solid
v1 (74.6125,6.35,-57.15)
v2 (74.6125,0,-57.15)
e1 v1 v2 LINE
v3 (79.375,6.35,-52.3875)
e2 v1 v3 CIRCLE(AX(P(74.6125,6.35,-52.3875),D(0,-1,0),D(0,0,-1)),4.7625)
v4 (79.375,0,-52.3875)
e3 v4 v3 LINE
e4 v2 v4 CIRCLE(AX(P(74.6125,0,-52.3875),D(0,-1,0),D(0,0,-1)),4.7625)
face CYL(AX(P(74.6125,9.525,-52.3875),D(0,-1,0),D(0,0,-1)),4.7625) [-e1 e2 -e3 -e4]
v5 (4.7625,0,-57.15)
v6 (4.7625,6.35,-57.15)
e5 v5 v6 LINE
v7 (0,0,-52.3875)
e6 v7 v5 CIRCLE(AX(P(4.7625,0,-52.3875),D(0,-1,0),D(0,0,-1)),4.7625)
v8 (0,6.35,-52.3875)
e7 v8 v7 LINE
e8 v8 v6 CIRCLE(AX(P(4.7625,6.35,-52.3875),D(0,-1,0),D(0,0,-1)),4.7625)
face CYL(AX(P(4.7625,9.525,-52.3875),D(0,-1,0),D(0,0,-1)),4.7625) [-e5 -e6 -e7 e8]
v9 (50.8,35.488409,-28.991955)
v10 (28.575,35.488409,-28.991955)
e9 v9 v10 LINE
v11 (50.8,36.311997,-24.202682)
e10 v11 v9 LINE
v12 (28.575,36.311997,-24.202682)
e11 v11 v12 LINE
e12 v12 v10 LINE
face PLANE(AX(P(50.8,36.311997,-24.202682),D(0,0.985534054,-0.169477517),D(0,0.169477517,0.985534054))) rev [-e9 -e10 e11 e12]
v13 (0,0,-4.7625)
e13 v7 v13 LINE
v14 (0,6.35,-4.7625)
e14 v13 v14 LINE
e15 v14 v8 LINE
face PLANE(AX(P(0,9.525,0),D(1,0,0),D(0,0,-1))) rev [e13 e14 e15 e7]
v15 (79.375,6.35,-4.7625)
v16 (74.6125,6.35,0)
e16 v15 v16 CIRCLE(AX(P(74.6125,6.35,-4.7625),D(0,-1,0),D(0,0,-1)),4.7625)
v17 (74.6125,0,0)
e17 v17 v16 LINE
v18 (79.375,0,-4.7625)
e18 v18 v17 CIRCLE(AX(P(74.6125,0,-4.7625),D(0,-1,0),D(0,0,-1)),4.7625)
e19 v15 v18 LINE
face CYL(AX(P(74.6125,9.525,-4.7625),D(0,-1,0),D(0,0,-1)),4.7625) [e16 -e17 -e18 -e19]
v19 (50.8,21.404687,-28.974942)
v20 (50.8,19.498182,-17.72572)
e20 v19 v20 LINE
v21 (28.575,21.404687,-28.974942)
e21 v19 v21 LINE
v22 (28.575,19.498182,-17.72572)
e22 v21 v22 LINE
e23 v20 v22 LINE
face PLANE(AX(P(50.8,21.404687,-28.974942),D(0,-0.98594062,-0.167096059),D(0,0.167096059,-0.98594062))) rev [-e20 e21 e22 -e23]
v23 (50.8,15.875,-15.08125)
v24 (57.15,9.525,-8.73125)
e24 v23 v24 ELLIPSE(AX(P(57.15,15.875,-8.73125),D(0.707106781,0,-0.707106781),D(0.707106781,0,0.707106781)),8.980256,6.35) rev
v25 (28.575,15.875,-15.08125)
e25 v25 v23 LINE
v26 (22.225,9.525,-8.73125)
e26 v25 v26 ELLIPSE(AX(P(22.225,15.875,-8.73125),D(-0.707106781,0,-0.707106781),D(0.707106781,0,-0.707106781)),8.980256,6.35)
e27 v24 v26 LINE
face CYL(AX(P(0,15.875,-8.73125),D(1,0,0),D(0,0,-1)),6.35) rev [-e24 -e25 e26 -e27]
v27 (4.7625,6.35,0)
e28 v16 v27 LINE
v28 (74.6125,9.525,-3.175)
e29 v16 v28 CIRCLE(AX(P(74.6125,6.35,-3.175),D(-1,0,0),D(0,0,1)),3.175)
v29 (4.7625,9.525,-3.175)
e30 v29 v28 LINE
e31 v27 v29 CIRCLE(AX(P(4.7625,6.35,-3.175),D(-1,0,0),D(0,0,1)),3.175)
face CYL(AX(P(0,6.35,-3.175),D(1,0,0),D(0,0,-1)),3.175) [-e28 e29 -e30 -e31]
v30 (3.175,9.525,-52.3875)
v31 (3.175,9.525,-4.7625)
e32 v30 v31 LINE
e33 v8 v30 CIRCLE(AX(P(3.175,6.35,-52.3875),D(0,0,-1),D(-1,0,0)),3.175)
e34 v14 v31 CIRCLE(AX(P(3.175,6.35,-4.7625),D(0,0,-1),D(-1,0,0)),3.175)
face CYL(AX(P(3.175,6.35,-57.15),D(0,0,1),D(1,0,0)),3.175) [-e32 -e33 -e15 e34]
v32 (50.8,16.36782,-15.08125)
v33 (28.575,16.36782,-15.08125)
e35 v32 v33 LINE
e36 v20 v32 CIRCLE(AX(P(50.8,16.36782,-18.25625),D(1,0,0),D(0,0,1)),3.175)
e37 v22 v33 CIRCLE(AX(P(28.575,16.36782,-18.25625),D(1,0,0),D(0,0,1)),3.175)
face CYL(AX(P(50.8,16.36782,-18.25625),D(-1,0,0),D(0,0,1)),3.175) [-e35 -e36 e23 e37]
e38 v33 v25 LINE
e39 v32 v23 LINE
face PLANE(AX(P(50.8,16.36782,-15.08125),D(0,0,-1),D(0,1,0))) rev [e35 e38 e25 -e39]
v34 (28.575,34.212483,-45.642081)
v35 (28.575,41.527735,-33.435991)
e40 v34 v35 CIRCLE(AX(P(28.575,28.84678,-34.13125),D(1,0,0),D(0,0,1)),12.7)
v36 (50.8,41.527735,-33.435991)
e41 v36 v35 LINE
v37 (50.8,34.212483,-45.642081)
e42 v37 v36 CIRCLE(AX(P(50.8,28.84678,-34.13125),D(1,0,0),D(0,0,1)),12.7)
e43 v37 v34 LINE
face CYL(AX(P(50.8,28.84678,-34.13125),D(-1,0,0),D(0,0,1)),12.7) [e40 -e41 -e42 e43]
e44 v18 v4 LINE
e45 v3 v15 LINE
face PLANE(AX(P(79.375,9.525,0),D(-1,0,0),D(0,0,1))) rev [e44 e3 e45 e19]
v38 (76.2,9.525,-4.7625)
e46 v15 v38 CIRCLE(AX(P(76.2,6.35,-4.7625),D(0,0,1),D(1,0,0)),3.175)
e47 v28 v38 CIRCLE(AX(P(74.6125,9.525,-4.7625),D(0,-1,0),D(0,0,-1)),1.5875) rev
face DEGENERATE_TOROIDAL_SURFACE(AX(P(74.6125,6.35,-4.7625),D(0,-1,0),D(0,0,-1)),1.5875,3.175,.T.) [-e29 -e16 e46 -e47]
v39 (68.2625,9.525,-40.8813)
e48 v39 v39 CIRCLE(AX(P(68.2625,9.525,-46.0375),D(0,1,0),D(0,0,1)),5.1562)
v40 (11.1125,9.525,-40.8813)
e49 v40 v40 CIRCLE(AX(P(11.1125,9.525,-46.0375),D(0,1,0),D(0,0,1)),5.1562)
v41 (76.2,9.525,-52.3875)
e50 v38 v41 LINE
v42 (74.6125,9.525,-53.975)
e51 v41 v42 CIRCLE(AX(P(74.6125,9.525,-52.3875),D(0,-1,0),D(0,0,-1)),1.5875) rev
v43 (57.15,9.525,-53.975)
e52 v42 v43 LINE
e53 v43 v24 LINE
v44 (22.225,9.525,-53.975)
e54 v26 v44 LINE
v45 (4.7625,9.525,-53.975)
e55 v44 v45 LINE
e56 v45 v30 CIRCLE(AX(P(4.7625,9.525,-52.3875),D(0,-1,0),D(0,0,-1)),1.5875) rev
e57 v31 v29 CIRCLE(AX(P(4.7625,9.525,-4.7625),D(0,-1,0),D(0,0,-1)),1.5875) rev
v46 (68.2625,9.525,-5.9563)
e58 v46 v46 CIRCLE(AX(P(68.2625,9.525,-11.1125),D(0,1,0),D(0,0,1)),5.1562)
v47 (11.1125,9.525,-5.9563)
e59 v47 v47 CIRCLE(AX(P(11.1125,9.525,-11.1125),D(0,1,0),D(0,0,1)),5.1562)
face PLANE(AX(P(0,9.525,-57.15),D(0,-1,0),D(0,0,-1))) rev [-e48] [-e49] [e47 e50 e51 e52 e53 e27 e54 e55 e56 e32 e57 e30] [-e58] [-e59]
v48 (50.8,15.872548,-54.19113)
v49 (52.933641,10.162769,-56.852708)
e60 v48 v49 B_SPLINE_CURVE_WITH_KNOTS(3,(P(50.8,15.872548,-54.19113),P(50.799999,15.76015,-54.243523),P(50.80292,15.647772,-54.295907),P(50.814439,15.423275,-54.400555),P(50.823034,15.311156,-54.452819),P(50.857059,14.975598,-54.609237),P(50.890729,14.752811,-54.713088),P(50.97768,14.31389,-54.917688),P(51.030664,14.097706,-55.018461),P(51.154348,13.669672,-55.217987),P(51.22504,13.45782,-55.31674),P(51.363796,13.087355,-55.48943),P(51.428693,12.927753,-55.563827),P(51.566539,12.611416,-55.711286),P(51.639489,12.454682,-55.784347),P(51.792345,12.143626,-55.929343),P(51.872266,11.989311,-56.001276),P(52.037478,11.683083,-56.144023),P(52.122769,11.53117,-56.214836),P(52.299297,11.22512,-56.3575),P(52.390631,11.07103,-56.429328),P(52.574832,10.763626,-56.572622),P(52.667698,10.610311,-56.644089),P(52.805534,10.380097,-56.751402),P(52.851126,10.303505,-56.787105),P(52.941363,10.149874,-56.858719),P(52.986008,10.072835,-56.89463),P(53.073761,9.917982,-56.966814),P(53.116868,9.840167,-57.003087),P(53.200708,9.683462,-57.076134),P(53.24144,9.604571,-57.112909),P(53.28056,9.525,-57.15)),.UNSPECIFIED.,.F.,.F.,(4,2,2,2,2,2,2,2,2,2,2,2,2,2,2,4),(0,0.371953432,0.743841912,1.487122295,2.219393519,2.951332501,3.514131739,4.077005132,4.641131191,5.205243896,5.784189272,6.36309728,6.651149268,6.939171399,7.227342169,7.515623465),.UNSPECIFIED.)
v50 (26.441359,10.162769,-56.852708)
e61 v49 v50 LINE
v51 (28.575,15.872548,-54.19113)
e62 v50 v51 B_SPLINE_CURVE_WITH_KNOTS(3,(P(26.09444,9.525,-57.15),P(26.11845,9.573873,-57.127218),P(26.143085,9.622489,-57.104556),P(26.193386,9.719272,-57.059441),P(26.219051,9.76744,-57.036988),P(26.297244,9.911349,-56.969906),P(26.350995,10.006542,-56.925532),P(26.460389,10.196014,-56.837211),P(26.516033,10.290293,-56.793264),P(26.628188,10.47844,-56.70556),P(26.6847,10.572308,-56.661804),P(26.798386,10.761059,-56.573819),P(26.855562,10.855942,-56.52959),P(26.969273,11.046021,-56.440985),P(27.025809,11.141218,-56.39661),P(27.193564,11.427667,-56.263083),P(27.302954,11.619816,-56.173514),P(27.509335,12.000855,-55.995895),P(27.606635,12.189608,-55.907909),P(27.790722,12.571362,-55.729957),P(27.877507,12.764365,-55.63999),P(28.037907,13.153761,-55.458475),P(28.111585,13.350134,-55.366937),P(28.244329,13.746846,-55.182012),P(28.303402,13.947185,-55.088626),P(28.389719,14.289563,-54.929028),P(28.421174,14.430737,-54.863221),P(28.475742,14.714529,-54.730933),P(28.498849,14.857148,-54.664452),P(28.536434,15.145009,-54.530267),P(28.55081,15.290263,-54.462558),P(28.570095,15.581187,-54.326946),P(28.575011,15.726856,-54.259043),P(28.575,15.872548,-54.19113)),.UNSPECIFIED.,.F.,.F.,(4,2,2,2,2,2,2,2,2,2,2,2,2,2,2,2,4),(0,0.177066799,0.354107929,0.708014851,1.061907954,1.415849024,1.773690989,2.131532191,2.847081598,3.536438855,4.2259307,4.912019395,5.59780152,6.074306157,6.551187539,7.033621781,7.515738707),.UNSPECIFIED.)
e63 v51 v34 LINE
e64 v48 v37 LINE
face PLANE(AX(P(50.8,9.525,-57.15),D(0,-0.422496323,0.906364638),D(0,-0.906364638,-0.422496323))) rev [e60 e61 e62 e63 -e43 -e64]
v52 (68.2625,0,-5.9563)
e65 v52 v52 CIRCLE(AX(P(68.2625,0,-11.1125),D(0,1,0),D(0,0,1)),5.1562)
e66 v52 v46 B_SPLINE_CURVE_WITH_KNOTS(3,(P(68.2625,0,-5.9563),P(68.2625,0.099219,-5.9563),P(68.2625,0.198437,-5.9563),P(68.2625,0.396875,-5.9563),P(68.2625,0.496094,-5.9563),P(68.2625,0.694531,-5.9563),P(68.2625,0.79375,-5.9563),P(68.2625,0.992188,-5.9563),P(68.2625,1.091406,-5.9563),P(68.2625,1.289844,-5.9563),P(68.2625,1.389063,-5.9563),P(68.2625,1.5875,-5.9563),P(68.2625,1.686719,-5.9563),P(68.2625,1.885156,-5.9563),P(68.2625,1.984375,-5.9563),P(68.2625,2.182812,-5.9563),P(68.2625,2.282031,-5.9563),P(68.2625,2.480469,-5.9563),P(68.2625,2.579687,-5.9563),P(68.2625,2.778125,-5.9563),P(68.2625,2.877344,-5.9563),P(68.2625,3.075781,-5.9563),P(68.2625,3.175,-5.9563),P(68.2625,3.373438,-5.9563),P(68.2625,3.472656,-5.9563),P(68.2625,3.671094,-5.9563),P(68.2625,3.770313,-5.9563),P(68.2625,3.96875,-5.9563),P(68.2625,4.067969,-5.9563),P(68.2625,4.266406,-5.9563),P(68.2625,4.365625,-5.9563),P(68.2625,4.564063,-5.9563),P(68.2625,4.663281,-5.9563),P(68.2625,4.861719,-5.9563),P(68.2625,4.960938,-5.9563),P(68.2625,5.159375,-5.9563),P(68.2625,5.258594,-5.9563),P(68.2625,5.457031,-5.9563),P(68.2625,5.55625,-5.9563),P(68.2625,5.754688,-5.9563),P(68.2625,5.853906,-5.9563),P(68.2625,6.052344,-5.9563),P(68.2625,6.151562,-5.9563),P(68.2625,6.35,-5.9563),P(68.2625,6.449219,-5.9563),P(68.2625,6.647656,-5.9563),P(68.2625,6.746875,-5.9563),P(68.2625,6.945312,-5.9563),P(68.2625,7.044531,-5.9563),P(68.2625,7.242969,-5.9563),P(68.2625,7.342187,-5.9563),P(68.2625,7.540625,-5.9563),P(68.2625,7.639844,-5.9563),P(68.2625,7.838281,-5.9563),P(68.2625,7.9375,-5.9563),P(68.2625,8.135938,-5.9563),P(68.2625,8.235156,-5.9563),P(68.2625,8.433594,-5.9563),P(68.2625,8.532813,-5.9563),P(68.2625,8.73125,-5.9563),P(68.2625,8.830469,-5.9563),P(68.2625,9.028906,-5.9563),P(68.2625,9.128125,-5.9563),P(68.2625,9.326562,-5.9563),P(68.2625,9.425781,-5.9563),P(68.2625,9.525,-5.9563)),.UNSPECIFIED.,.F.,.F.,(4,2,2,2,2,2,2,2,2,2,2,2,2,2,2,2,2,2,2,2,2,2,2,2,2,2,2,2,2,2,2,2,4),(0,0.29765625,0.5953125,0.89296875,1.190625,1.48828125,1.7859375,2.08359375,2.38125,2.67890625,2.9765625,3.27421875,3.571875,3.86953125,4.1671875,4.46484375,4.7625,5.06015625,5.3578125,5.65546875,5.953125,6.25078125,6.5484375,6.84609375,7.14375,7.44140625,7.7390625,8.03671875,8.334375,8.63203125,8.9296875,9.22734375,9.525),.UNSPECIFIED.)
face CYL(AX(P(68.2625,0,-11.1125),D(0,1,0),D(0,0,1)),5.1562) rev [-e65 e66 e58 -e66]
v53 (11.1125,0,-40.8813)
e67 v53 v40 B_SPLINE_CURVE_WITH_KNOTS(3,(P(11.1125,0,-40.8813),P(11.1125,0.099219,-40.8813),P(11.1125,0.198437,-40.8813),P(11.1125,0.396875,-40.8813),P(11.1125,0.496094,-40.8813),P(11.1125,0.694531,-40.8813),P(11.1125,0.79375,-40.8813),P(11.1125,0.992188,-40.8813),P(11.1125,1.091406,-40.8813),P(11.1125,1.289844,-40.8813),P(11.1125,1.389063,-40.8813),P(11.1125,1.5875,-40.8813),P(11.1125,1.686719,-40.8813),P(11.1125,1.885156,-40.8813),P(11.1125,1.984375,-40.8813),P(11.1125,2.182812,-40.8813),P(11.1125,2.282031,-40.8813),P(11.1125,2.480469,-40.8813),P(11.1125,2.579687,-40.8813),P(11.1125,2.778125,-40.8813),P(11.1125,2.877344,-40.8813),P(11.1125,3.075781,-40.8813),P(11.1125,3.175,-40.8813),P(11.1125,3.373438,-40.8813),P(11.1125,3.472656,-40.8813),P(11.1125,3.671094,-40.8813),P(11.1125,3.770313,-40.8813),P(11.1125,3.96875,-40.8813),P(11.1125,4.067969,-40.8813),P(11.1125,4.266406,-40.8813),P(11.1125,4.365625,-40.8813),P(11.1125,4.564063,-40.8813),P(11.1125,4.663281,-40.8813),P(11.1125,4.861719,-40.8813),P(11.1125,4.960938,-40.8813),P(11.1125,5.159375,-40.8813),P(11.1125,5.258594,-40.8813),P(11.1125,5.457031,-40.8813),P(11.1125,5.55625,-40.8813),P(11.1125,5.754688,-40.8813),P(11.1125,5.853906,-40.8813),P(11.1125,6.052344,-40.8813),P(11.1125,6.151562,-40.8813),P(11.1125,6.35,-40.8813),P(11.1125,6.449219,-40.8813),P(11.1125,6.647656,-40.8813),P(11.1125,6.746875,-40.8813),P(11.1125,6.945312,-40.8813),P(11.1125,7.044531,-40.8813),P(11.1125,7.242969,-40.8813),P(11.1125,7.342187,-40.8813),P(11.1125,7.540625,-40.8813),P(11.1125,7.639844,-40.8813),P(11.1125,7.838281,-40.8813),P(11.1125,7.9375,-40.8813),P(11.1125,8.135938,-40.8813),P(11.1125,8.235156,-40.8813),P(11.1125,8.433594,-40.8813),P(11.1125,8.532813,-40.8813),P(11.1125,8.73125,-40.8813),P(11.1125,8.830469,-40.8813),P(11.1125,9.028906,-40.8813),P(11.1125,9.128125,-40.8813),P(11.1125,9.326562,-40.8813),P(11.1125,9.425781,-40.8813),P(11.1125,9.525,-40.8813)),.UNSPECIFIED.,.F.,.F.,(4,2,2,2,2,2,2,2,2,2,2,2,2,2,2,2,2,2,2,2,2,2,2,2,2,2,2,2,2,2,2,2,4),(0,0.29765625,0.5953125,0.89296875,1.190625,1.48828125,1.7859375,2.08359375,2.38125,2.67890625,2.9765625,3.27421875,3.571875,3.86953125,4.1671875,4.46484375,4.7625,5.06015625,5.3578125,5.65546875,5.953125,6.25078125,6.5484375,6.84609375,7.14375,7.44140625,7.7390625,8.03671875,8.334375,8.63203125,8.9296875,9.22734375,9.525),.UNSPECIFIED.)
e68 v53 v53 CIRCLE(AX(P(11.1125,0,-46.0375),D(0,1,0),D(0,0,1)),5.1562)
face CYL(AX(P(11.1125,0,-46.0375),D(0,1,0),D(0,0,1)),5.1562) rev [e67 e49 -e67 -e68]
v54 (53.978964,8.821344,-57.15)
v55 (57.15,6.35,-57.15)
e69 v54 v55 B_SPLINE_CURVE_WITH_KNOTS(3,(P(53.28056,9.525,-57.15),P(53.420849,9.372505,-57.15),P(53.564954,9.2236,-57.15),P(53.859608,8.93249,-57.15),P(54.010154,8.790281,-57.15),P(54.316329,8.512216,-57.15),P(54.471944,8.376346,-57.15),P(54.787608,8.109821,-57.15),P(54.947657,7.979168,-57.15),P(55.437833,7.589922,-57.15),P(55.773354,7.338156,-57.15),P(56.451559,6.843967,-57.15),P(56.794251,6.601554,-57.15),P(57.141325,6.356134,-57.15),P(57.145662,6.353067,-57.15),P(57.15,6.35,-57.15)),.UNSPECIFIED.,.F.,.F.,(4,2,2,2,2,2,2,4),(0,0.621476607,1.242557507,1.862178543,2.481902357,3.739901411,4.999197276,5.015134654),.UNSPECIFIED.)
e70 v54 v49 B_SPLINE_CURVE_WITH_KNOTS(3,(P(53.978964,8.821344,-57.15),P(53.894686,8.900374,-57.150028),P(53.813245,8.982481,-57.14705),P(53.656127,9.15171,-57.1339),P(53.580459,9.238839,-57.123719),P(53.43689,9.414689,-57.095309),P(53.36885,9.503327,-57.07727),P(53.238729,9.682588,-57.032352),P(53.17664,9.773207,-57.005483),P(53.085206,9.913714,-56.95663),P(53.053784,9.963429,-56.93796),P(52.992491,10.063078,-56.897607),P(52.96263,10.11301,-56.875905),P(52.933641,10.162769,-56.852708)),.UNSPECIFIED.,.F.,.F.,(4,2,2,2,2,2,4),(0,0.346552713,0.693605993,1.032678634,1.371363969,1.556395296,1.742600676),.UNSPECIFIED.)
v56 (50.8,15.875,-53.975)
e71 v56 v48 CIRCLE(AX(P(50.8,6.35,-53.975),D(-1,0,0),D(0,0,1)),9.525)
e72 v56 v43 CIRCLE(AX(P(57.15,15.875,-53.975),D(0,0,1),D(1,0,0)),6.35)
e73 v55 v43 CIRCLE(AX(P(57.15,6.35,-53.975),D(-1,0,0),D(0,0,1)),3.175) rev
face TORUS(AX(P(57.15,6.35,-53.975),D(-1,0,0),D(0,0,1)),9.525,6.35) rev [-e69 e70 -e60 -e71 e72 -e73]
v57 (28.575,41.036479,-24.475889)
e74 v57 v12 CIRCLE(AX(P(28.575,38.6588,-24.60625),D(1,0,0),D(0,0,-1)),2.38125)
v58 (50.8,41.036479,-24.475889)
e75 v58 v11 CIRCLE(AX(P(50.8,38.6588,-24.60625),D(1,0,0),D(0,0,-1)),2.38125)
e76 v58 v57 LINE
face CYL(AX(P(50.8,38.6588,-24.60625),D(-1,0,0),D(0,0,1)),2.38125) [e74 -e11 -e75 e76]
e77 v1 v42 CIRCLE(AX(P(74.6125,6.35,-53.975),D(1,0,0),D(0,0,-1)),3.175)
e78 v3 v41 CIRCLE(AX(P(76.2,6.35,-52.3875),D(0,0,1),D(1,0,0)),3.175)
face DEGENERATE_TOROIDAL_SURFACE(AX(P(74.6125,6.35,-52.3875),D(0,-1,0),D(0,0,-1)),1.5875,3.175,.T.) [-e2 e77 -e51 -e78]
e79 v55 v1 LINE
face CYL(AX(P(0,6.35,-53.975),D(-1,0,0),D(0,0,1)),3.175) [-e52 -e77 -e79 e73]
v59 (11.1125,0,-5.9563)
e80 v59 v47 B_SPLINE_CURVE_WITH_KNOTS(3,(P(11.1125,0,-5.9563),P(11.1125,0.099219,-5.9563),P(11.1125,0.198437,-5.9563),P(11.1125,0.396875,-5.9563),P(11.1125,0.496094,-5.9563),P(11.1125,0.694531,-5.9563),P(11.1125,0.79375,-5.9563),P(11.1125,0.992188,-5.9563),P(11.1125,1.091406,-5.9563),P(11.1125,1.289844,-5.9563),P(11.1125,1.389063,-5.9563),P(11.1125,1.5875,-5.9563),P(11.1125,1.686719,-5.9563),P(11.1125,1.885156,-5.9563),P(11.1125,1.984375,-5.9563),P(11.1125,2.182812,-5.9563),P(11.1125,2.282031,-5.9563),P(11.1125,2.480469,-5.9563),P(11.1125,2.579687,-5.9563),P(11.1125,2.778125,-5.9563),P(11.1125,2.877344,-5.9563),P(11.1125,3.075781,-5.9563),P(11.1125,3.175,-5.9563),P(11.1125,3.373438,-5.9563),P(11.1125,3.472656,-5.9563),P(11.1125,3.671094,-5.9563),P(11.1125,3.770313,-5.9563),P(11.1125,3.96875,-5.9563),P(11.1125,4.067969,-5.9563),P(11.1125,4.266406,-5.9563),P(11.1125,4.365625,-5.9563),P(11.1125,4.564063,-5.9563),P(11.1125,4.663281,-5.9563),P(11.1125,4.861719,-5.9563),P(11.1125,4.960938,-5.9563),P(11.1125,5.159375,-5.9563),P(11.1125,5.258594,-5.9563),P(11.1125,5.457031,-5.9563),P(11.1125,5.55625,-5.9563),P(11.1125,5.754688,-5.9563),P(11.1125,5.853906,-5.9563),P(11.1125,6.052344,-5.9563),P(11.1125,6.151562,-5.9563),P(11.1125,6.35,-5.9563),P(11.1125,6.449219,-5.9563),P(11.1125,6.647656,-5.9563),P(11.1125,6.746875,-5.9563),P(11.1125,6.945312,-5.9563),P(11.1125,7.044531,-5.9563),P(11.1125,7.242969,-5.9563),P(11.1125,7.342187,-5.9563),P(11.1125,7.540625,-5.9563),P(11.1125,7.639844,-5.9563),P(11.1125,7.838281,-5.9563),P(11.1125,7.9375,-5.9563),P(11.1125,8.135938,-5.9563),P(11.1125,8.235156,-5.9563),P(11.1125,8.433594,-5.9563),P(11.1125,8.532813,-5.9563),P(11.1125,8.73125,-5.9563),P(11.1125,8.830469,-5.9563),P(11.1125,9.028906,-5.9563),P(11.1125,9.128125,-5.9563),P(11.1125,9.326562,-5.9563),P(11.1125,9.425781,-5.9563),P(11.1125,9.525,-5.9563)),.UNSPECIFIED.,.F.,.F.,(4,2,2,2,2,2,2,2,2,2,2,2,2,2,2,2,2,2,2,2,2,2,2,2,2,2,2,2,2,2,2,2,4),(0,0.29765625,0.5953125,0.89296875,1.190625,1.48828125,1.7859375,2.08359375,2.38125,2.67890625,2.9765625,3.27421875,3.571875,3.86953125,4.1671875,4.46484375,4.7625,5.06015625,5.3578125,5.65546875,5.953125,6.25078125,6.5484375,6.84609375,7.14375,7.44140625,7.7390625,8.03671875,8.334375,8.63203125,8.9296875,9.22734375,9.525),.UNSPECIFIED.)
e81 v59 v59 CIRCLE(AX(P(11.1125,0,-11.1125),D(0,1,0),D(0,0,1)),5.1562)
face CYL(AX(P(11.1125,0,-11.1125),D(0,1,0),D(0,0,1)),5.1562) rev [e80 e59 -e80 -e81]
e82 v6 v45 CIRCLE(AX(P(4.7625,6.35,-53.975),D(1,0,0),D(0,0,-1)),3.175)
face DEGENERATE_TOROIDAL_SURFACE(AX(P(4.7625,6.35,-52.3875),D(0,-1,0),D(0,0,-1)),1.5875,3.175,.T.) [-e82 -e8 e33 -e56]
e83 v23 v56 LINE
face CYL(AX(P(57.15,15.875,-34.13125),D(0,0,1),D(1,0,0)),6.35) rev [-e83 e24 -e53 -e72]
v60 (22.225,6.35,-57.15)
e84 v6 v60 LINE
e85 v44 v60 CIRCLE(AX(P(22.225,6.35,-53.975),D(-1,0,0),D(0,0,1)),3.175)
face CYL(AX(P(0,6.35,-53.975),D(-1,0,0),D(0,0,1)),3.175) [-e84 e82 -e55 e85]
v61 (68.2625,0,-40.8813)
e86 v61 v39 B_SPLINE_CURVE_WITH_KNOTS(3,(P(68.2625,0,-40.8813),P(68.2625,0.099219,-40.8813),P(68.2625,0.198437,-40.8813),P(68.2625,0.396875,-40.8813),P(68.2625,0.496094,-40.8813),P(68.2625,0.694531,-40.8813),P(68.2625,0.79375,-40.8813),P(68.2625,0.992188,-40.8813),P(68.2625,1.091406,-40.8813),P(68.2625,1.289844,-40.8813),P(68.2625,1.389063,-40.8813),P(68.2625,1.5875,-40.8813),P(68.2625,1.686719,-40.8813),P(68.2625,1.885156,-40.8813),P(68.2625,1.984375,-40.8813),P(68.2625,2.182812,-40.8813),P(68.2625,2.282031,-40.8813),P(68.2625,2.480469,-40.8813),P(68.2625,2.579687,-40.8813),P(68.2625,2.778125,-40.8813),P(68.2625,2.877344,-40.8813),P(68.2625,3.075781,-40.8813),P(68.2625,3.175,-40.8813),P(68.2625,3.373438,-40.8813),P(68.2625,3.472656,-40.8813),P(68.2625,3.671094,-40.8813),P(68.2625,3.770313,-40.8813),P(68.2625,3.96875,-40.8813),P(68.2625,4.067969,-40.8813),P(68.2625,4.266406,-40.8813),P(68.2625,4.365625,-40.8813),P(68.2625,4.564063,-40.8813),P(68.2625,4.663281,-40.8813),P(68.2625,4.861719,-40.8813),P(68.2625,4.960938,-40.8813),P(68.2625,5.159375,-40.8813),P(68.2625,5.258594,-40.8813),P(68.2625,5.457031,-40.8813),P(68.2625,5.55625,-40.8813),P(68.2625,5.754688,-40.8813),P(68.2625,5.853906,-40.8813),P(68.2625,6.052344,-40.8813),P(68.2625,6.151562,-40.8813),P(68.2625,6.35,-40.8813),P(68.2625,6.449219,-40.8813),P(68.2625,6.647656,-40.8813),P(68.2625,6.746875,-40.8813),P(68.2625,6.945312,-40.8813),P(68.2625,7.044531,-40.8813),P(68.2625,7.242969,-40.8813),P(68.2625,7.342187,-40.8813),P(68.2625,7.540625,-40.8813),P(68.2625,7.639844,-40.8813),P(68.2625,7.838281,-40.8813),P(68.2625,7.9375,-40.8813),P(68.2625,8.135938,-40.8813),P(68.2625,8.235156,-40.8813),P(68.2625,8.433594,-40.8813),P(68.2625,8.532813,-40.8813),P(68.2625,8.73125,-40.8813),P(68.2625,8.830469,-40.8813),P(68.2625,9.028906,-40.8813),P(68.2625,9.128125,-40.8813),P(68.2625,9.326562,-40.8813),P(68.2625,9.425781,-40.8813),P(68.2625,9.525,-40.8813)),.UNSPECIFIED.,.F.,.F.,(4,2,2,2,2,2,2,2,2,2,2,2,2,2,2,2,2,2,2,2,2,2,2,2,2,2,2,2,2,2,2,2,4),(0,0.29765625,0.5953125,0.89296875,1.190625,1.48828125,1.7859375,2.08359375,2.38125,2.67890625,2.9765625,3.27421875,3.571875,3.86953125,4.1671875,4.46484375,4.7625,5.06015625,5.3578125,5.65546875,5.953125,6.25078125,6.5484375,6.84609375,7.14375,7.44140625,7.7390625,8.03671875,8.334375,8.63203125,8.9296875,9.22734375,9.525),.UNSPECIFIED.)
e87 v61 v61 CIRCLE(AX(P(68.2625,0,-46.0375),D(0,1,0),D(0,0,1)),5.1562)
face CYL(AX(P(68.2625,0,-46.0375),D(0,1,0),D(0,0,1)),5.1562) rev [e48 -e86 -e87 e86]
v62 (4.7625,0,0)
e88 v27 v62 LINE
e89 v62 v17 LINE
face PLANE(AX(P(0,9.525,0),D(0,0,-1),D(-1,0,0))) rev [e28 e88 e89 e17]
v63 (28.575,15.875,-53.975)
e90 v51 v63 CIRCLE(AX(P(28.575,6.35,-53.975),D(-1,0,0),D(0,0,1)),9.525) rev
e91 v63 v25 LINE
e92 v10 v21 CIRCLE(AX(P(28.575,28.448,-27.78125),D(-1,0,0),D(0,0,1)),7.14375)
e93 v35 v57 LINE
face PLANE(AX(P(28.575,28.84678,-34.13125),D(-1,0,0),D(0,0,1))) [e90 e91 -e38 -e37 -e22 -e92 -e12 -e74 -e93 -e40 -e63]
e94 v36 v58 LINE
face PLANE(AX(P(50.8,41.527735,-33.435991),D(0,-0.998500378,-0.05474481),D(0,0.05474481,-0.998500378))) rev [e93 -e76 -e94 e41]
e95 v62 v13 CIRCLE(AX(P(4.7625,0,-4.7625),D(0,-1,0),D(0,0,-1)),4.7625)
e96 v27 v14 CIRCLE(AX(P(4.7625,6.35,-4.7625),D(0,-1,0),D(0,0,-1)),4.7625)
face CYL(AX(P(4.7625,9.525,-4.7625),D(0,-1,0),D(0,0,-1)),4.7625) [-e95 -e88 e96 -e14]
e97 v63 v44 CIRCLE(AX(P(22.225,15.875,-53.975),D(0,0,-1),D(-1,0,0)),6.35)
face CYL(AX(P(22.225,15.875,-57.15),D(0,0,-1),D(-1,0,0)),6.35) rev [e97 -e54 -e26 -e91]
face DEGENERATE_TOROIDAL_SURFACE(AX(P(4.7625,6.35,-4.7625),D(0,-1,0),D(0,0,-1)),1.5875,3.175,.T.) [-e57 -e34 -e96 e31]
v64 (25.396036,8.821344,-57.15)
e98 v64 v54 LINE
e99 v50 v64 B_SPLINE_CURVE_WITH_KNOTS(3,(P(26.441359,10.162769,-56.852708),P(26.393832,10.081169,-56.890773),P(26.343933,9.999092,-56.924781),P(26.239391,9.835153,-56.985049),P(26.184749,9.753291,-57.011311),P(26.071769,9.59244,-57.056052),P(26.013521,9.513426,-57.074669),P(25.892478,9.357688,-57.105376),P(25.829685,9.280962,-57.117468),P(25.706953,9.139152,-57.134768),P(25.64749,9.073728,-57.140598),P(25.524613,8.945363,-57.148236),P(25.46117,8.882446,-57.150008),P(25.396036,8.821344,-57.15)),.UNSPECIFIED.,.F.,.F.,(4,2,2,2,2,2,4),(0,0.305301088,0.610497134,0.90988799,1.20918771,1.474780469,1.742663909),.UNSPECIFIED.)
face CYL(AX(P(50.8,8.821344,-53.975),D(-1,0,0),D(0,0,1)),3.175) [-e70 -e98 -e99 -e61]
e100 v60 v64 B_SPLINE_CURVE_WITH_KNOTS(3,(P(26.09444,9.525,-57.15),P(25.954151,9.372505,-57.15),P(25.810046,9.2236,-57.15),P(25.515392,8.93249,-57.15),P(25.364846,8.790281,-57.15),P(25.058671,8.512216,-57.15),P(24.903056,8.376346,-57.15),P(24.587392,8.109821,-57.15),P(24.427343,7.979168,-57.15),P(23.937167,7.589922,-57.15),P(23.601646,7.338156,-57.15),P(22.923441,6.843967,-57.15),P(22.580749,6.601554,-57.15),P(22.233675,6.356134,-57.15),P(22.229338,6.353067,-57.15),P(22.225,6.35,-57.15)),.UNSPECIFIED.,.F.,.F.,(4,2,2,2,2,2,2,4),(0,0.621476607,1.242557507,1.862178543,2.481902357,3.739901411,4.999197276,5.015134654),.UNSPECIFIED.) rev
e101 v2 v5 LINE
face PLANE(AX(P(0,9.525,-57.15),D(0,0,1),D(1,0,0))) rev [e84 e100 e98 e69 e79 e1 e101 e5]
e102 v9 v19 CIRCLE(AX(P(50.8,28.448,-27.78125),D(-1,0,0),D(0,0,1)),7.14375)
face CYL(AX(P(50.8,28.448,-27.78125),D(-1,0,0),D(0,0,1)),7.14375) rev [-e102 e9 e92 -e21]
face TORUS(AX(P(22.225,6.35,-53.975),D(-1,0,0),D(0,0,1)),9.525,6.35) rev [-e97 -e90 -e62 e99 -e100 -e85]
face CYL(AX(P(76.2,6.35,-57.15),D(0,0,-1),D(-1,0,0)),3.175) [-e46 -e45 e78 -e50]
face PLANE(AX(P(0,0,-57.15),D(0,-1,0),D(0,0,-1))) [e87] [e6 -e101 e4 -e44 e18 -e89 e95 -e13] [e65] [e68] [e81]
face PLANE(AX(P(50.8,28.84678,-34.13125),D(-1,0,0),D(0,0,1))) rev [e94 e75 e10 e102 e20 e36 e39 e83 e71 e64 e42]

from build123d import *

# Parameters (mm, degrees)
SKETCH1_W           = 79.375
SKETCH1_H           = 57.14999999999999
BASE_EXTRUDE_DEPTH  = 9.525
SKETCH2_R           = 5.1562
CUT_EXTRUDE1_DEPTH  = 99.27125088244273
BOSS_EXTRUDE1_DEPTH = 11.112499999999999
FILLET1_R           = 4.7625
FILLET3_R           = 3.175
FILLET5_R           = 6.35
FILLET6_R           = 3.175


with BuildPart() as part:
    # Sketch1 → Base-Extrude (new body)
    with BuildSketch(Plane(origin=(0, 0, 0), x_dir=(1, 0, 0), z_dir=(0, 1, 0))):
        with Locations((39.6875, 28.574999999999996)):
            Rectangle(SKETCH1_W, SKETCH1_H)
    extrude(amount=BASE_EXTRUDE_DEPTH)

    # Sketch2 → Cut-Extrude1 (cut, through all)
    with BuildSketch(Plane(origin=(0, 9.525, 0), x_dir=(-1, 0, 0), z_dir=(0, 1, 0))):
        with Locations(Location((-11.112499999999999, -46.037499999999994, 0), (0, 0, 90))):
            Circle(SKETCH2_R)
        with Locations(Location((-11.112499999999999, -11.112499999999997, 0), (0, 0, 90))):
            Circle(SKETCH2_R)
        with Locations(Location((-68.2625, -11.112499999999997, 0), (0, 0, 90))):
            Circle(SKETCH2_R)
        with Locations(Location((-68.2625, -46.037499999999994, 0), (0, 0, 90))):
            Circle(SKETCH2_R)
    extrude(amount=-CUT_EXTRUDE1_DEPTH, mode=Mode.SUBTRACT)

    # Sketch3 → Boss-Extrude1 (add, symmetric)
    with BuildSketch(Plane(origin=(39.6875, 0, 0), x_dir=(0, 0, -1), z_dir=(1, 0, 0))):
        with BuildLine():
            Line((15.081249999999999, 9.525), (57.15, 9.525))
            Line((57.15, 9.525), (45.642080901347875, 34.2124833053063))
            ThreePointArc((45.642080901347875, 34.2124833053063), (40.65983135726152, 39.74024710013013), (33.435990911126424, 41.52773480629668))
            Line((33.435990911126424, 41.52773480629668), (24.475888920836205, 41.03647902618064))
            ThreePointArc((24.475888920836205, 41.03647902618064), (22.228971581677126, 38.79627321294108), (24.202681662531663, 36.31199703436931))
            Line((24.202681662531663, 36.31199703436931), (28.991955012405008, 35.48840889689211))
            ThreePointArc((28.991955012405008, 35.48840889689211), (34.924994788062534, 28.439370658797703), (28.97494247235726, 21.40468669276046))
            Line((28.97494247235726, 21.40468669276046), (17.72572001228568, 19.498181673786302))
            ThreePointArc((17.72572001228568, 19.498181673786302), (15.830857484241669, 18.416745811263993), (15.081249999999997, 16.367820203902035))
            Line((15.081249999999997, 16.367820203902035), (15.081249999999999, 9.525))
        make_face()
    extrude(amount=BOSS_EXTRUDE1_DEPTH, both=True)

    # Fillet1
    fillet1_edges = [part.edges().sort_by_distance(p)[0] for p in [
        (0, 4.7625, -57.15),
        (79.375, 4.7625, -57.15),
        (79.375, 4.7625, 0),
        (0, 4.7625, 0),
    ]]
    fillet(fillet1_edges, radius=FILLET1_R)

    # Fillet3
    fillet3_edges = [part.edges().sort_by_distance(p)[0] for p in [
        (16.668750000000003, 9.525, -57.15),
        (39.6875, 9.525, 0),
        (0, 9.525, -28.575),
        (79.375, 9.525, -28.575),
        (62.70625, 9.525, -57.15),
        (77.98009604540093, 9.525, -55.75509604540093),
        (1.3949039545990662, 9.525, -55.75509604540093),
        (77.98009604540093, 9.525, -1.3949039545990662),
        (1.3949039545990667, 9.525, -1.3949039545990662),
    ]]
    fillet(fillet3_edges, radius=FILLET3_R)

    # Fillet5
    # the kernel refuses this fillet: 6.35 mm, written as the material it adds along each edge
    with BuildSketch(Plane(origin=(28.575000000000003, 9.525, -15.081249999999997), x_dir=(-1, 0, 0), z_dir=(0, 0, -1))) as fillet5_piece_1:
        with BuildLine():
            CenterArc((FILLET5_R, FILLET5_R), FILLET5_R, 180, 90)
            Line((0, FILLET5_R), (0, 0))
            Line((0, 0), (FILLET5_R, 0))
        make_face()
    extrude(amount=38.893750000000004)
    with BuildSketch(Plane(origin=(50.8, 9.525, -15.081249999999999), x_dir=(0, 0, 1), z_dir=(-1, 0, 0))) as fillet5_piece_2:
        with BuildLine():
            CenterArc((FILLET5_R, FILLET5_R), FILLET5_R, 180, 90)
            Line((3.55e-15, FILLET5_R), (0, 0))
            Line((0, 0), (FILLET5_R, 0))
        make_face()
    extrude(amount=22.224999999999994)
    with BuildSketch(Plane(origin=(50.8, 9.525, -15.081249999999997), x_dir=(1, 0, 0), z_dir=(0, 0, -1))) as fillet5_piece_3:
        with BuildLine():
            CenterArc((FILLET5_R, -FILLET5_R), FILLET5_R, 90, 90)
            Line((0, -FILLET5_R), (0, 0))
            Line((0, 0), (FILLET5_R, 0))
        make_face()
    extrude(amount=38.893750000000004)
    with BuildSketch(Plane(origin=(28.575000000000003, 6.350000000000001, -53.975), x_dir=(0, 1, 0), z_dir=(0, 0, 1))) as fillet5_piece_4_section:
        with BuildLine():
            CenterArc((3.174999999999999 + FILLET5_R, FILLET5_R), FILLET5_R, 180.00000000000003, 90)
            Line((3.174999999999999, FILLET5_R), (3.174999999999999, 0))
            Line((3.174999999999999, 0), (3.174999999999999 + FILLET5_R, 0))
        make_face()
    fillet5_piece_4 = revolve(axis=Axis((28.575000000000003, 6.350000000000001, -53.975), (-1, 0, 0)), revolution_arc=359.64000000000004, mode=Mode.PRIVATE)
    fillet5_piece_4 = split(fillet5_piece_4, bisect_by=Plane(origin=(28.575000000000003, 0, -53.975), z_dir=(0, 1, 0)), keep=Keep.TOP, mode=Mode.PRIVATE)
    fillet5_piece_4 = split(fillet5_piece_4, bisect_by=Plane(origin=(28.575000000000003, 6.350000000000001, -57.15), z_dir=(0, 0, 1)), keep=Keep.TOP, mode=Mode.PRIVATE)
    fillet5_piece_4 = split(fillet5_piece_4, bisect_by=Plane(origin=(28.575000000000003, 8.132568412888961, -57.799073453811204), z_dir=(0, -0.42249632325246483, 0.9063646379014071)), keep=Keep.TOP, mode=Mode.PRIVATE)
    add(fillet5_piece_4)
    with BuildSketch(Plane(origin=(50.8, 6.350000000000001, -53.975), x_dir=(0, 1, 0), z_dir=(0, 0, 1))) as fillet5_piece_5_section:
        with BuildLine():
            CenterArc((3.174999999999999 + FILLET5_R, -FILLET5_R), FILLET5_R, 90, 90)
            Line((3.174999999999999, -FILLET5_R), (3.174999999999999, 0))
            Line((3.174999999999999, 0), (3.174999999999999 + FILLET5_R, 0))
        make_face()
    fillet5_piece_5 = revolve(axis=Axis((50.8, 6.350000000000001, -53.975), (-1, 0, 0)), revolution_arc=359.64000000000004, mode=Mode.PRIVATE)
    fillet5_piece_5 = split(fillet5_piece_5, bisect_by=Plane(origin=(50.8, 0, -53.975), z_dir=(0, 1, 0)), keep=Keep.TOP, mode=Mode.PRIVATE)
    fillet5_piece_5 = split(fillet5_piece_5, bisect_by=Plane(origin=(50.8, 6.350000000000001, -57.15), z_dir=(0, 0, 1)), keep=Keep.TOP, mode=Mode.PRIVATE)
    fillet5_piece_5 = split(fillet5_piece_5, bisect_by=Plane(origin=(50.8, 8.132568412888961, -57.799073453811204), z_dir=(0, -0.42249632325246483, 0.9063646379014071)), keep=Keep.TOP, mode=Mode.PRIVATE)
    add(fillet5_piece_5)
    with BuildSketch(Plane(origin=(28.575000000000003, 9.525, 0.7937500000000028), x_dir=(-1, 0, 0), z_dir=(0, 0, -1))) as fillet5_piece_6a_section:
        with BuildLine():
            CenterArc((FILLET5_R, FILLET5_R), FILLET5_R, 180, 90)
            Line((0, FILLET5_R), (0, 0))
            Line((0, 0), (FILLET5_R, 0))
        make_face()
    fillet5_piece_6a = extrude(amount=54.768750000000004, mode=Mode.PRIVATE)
    fillet5_piece_6a = split(fillet5_piece_6a, bisect_by=Plane(origin=(28.575000000000003, 9.525000000000004, -15.081249999999999), z_dir=(0, -2.6e-16, 1)), keep=Keep.TOP, mode=Mode.PRIVATE)
    with BuildSketch(Plane(origin=(50.8, 9.525, -15.081249999999999), x_dir=(0, 0, 1), z_dir=(-1, 0, 0))) as fillet5_piece_6b_section:
        with BuildLine():
            CenterArc((FILLET5_R, FILLET5_R), FILLET5_R, 180, 90)
            Line((3.55e-15, FILLET5_R), (0, 0))
            Line((0, 0), (FILLET5_R, 0))
        make_face()
    fillet5_piece_6b = extrude(amount=38.1, mode=Mode.PRIVATE)
    fillet5_piece_6b = fillet5_piece_6b - Plane(origin=(11.112499999999999, 9.525, -11.112499999999997), x_dir=(-6e-17, 0, 1), z_dir=(0, 1, 0)) * Cylinder(5.1562, 102, mode=Mode.PRIVATE)
    fillet5_piece_6b = split(fillet5_piece_6b, bisect_by=Plane(origin=(28.575000000000003, 9.525, -15.081249999999999), z_dir=(-1, 0, 0)), keep=Keep.TOP, mode=Mode.PRIVATE)
    fillet5_piece_6 = fillet5_piece_6a & fillet5_piece_6b
    add(fillet5_piece_6)
    with BuildSketch(Plane(origin=(66.675, 9.525, -15.081249999999999), x_dir=(0, 0, 1), z_dir=(-1, 0, 0))) as fillet5_piece_7a_section:
        with BuildLine():
            CenterArc((FILLET5_R, FILLET5_R), FILLET5_R, 180, 90)
            Line((3.55e-15, FILLET5_R), (0, 0))
            Line((0, 0), (FILLET5_R, 0))
        make_face()
    fillet5_piece_7a = extrude(amount=38.099999999999994, mode=Mode.PRIVATE)
    fillet5_piece_7a = fillet5_piece_7a - Plane(origin=(68.2625, 9.525, -11.112499999999997), x_dir=(-6e-17, 0, 1), z_dir=(0, 1, 0)) * Cylinder(5.1562, 102, mode=Mode.PRIVATE)
    fillet5_piece_7a = split(fillet5_piece_7a, bisect_by=Plane(origin=(50.8, 9.525, -15.081249999999999), z_dir=(1, 0, 0)), keep=Keep.TOP, mode=Mode.PRIVATE)
    with BuildSketch(Plane(origin=(50.8, 9.525, 0.7937500000000028), x_dir=(1, 0, 0), z_dir=(0, 0, -1))) as fillet5_piece_7b_section:
        with BuildLine():
            CenterArc((FILLET5_R, -FILLET5_R), FILLET5_R, 90, 90)
            Line((0, -FILLET5_R), (0, 0))
            Line((0, 0), (FILLET5_R, 0))
        make_face()
    fillet5_piece_7b = extrude(amount=54.768750000000004, mode=Mode.PRIVATE)
    fillet5_piece_7b = split(fillet5_piece_7b, bisect_by=Plane(origin=(50.8, 9.525000000000004, -15.081249999999999), z_dir=(0, -2.6e-16, 1)), keep=Keep.TOP, mode=Mode.PRIVATE)
    fillet5_piece_7 = fillet5_piece_7a & fillet5_piece_7b
    add(fillet5_piece_7)

    # Fillet6
    fillet6_edges = [part.edges().sort_by_distance(p)[0] for p in [
        (39.6875, 9.525000000000507, -57.150000000000006),
    ]]
    fillet(fillet6_edges, radius=FILLET6_R)


solid = part.part
